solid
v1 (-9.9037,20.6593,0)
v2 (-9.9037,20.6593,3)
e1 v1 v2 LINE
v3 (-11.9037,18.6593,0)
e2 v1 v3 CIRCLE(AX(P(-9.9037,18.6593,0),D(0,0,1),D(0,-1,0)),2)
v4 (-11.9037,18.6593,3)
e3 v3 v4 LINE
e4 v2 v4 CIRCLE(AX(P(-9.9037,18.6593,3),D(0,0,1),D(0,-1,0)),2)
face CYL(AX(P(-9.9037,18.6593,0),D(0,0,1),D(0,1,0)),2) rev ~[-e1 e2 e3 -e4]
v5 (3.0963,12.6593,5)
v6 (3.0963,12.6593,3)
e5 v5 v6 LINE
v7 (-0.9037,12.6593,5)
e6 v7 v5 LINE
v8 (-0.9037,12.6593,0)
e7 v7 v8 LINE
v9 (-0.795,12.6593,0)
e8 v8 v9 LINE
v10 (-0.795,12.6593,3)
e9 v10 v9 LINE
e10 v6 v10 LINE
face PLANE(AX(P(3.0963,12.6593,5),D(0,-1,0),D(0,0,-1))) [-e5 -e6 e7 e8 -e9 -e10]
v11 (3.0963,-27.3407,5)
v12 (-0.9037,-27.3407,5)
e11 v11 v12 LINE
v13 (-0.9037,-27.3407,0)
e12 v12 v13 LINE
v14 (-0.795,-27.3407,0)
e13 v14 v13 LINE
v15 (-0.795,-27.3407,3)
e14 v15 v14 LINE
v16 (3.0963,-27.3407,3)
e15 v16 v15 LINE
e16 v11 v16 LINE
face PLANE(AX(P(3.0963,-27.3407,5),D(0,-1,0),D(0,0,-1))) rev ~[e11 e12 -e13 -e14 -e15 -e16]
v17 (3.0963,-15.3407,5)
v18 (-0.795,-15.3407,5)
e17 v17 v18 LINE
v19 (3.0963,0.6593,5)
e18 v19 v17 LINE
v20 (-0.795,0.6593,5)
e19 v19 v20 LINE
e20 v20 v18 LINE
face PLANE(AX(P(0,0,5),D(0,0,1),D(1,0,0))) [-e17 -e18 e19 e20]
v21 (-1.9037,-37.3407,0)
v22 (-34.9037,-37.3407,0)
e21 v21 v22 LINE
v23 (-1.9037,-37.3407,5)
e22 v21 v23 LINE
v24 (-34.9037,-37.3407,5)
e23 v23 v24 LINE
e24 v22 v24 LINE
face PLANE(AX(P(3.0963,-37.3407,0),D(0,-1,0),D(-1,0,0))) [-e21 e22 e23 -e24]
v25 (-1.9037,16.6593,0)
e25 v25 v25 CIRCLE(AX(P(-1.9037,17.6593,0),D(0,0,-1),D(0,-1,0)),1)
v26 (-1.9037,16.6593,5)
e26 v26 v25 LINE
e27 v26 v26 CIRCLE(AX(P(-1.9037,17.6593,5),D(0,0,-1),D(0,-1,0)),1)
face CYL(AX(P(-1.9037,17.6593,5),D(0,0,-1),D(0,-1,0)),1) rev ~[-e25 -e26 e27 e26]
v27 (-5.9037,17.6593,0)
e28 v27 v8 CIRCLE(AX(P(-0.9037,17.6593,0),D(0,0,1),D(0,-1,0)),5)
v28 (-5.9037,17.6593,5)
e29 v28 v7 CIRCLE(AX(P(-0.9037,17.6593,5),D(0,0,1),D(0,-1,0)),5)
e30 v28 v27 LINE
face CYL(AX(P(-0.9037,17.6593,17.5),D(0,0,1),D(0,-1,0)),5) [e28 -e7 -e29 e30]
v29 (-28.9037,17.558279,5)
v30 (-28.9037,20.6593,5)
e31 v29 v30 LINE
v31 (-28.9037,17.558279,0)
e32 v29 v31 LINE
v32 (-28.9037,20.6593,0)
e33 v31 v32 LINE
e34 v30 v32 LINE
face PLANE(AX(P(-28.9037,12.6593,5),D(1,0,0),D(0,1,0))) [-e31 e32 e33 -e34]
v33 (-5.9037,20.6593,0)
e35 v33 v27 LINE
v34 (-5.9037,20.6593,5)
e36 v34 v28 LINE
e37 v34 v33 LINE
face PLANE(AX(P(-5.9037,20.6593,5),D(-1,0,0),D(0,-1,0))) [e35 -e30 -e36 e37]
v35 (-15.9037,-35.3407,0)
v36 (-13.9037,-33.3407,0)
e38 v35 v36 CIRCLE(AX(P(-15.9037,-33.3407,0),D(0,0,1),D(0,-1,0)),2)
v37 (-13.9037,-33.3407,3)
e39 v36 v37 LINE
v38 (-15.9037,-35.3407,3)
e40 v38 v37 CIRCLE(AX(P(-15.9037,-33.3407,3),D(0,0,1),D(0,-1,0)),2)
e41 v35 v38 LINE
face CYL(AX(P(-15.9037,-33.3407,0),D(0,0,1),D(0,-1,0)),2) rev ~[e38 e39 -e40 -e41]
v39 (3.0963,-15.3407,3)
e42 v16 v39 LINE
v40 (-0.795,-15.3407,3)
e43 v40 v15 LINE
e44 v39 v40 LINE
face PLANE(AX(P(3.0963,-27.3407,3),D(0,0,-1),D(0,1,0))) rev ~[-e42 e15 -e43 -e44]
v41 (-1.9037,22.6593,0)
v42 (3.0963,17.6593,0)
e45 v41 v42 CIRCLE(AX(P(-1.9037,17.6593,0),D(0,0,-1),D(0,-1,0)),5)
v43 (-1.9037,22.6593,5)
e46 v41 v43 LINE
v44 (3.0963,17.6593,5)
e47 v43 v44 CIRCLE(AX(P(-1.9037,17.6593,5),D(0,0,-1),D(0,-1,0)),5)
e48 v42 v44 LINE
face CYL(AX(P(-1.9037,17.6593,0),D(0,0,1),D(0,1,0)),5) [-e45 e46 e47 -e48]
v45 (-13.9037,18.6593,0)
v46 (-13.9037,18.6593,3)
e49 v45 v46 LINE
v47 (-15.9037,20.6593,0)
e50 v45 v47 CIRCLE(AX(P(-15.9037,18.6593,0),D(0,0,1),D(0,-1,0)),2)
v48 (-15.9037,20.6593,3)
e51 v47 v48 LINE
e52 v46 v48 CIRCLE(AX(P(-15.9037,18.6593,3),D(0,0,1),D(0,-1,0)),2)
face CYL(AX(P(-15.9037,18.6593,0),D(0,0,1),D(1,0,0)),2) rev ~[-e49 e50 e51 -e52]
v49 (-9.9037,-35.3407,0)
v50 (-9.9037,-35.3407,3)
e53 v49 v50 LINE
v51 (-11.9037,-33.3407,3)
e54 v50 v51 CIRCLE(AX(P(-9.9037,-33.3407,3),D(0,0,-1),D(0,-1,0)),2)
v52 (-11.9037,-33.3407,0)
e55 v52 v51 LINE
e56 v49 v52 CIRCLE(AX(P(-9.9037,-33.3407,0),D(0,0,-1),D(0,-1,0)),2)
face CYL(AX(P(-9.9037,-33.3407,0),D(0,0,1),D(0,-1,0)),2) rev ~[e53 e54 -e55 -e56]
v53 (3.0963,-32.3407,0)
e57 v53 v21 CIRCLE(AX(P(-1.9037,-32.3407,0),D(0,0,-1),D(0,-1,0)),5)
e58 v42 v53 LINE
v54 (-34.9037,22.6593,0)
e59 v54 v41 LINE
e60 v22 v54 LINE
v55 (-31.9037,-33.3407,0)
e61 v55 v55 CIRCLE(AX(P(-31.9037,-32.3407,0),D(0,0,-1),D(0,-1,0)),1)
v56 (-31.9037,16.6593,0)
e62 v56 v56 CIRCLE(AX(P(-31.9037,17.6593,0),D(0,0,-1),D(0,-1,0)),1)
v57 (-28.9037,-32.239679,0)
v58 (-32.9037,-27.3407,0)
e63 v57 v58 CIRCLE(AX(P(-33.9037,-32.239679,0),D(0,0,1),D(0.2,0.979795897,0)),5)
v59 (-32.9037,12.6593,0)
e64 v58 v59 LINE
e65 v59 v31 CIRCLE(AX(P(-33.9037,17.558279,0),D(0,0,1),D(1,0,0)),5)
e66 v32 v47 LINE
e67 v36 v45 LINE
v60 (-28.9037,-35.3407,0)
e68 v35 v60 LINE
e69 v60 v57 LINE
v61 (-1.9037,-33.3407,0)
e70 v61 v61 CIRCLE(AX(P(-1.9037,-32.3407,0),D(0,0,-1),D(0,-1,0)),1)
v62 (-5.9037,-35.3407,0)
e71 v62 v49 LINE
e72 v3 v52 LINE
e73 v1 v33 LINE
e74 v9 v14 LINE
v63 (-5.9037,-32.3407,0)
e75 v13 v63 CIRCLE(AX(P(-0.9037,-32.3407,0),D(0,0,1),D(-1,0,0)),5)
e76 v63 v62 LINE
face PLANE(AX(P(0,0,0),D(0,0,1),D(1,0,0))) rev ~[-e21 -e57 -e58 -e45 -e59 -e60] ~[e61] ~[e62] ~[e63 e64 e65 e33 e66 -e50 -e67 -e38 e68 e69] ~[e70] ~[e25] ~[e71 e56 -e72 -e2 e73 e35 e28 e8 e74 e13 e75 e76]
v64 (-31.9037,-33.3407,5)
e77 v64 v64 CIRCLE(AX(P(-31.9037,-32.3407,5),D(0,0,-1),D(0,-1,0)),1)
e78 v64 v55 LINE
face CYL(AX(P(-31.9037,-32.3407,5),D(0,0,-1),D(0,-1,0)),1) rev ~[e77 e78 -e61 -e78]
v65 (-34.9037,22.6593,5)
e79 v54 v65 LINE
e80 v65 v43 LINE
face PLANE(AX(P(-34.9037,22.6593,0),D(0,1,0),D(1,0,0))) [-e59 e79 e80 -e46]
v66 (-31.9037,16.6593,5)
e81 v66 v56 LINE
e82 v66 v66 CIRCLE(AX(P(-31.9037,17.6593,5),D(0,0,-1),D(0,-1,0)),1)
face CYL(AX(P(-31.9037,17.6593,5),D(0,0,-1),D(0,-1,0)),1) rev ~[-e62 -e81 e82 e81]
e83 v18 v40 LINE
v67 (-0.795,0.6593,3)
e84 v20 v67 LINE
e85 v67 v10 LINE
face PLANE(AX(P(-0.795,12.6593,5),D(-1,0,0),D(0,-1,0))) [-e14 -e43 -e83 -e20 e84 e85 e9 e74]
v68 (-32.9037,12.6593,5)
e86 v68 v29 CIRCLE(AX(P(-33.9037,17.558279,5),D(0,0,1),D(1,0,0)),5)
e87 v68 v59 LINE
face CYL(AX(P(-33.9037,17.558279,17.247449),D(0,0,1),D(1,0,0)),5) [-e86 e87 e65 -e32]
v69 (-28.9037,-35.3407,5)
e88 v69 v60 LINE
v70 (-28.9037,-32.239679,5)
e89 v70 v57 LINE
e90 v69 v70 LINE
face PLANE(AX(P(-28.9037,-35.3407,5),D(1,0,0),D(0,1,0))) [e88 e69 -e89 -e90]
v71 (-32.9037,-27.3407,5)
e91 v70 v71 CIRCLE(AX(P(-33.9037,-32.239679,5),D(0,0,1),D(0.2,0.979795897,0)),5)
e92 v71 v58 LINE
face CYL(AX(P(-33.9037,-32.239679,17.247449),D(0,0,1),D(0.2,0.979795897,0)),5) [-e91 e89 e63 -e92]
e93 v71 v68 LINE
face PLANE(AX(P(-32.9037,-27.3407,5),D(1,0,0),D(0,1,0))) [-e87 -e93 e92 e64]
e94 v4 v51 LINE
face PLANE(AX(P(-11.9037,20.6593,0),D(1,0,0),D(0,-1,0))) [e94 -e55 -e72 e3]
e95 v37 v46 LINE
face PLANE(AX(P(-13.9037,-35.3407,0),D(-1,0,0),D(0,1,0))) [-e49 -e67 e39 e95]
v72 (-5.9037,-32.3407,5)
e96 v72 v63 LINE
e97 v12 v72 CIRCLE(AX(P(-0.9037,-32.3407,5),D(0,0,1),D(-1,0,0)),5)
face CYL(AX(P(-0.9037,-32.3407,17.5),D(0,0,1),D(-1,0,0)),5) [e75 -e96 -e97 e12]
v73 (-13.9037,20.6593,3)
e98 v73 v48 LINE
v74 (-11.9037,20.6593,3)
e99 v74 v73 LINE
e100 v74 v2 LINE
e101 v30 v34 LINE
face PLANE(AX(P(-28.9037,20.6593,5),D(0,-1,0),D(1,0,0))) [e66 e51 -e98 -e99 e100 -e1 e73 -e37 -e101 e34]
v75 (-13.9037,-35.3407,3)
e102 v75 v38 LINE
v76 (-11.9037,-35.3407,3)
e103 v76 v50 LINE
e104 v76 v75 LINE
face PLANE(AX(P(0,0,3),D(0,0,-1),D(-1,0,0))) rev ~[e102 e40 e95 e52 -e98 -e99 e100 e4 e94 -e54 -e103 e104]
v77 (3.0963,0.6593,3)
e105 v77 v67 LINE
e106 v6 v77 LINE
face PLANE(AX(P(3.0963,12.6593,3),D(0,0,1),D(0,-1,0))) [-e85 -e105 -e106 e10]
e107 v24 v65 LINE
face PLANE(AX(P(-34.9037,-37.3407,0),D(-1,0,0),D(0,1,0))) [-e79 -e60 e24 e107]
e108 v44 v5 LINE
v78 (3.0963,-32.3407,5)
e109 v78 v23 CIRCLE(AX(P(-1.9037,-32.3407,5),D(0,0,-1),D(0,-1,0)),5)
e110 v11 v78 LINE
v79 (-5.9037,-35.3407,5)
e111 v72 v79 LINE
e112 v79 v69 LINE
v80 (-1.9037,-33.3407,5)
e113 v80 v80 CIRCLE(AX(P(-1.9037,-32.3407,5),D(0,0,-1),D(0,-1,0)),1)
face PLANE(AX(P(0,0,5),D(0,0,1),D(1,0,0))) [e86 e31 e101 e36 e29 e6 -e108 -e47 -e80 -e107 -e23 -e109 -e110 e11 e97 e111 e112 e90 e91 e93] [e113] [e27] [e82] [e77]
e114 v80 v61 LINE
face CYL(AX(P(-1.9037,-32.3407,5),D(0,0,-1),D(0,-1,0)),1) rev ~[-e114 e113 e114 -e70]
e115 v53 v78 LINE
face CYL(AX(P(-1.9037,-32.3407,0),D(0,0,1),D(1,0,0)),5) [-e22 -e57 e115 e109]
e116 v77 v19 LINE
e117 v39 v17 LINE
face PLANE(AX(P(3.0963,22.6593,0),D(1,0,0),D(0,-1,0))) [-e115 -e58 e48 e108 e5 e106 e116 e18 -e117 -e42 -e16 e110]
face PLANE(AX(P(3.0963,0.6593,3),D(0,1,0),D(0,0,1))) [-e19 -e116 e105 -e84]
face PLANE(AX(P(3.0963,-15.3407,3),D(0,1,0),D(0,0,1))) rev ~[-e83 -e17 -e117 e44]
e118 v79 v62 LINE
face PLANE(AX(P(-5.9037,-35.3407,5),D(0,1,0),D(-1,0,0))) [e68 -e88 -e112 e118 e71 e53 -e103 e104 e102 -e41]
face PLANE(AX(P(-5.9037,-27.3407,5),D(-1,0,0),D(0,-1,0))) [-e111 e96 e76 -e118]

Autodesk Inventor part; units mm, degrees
ref_plane "YZ Plane" through (0, 0, 0) normal (1, 0, 0) x (0, 1, 0)
ref_plane "XZ Plane" through (0, 0, 0) normal (0, 1, 0) x (-1, 0, 0)
ref_plane "XY Plane" through (0, 0, 0) normal (0, 0, 1) x (1, 0, 0)
sketch "Sketch1" plane through (0, 0, 0) normal (0, 0, 1) x (1, 0, 0)
  line L0 (-34.9037, 22.6593) -> (3.0963, 22.6593)
  line L1 (3.0963, 22.6593) -> (3.0963, -37.3407)
  line L2 (3.0963, -37.3407) -> (-34.9037, -37.3407)
  line L3 (-34.9037, -37.3407) -> (-34.9037, 22.6593)
  point P0 (0, 0)
  dimension "d0" = 38
  dimension "d1" = 60
extrude "Extrusion1" add sketch "Sketch1" along normal blind 5
sketch "Sketch2" plane through (0, 0, 5) normal (0, 0, 1) x (1, 0, 0)
  line L0 (3.0963, -37.3407) -> (3.0963, 22.6593) projected
  line L1 (3.0963, 22.6593) -> (-34.9037, 22.6593) projected
  line L2 (-34.9037, -37.3407) -> (3.0963, -37.3407) projected
  point P0 (0, 0)
  point P1 (-31.9037, 17.6593)
  point P2 (-1.9037, 17.6593)
  point P3 (-31.9037, -32.3407)
  point P4 (-1.9037, -32.3407)
  dimension "d4" = 30
  dimension "d5" = 30
  dimension "d6" = 5
  dimension "d7" = 5
  dimension "d8" = 5
  dimension "d9" = 5
  dimension "d10" = 5
  dimension "d11" = 5
hole "Hole1" at (-31.9037, 17.6593, 5) at (-1.9037, 17.6593, 5) at (-31.9037, -32.3407, 5) at (-1.9037, -32.3407, 5) direction (0, 0, -1) diameter 2 depth 10 tip angle 118
sketch "Sketch3" plane through (0, 0, 5) normal (0, 0, 1) x (1, 0, 0)
  line L0 (-28.9037, 20.6593) -> (-5.9037, 20.6593)
  line L1 (-5.9037, 20.6593) -> (-5.9037, -35.3407)
  line L2 (-5.9037, -35.3407) -> (-28.9037, -35.3407)
  line L3 (-28.9037, -35.3407) -> (-28.9037, 20.6593)
  line L4 (-32.9037, 12.6593) -> (-0.795, 12.6593)
  line L5 (-0.795, 12.6593) -> (-0.795, -27.3407)
  line L6 (-0.795, -27.3407) -> (-32.9037, -27.3407)
  line L7 (-32.9037, -27.3407) -> (-32.9037, 12.6593)
  line L8 (-34.9037, 22.6593) -> (-34.9037, -37.3407) projected
  line L9 (3.0963, -37.3407) -> (3.0963, 22.6593) projected
  line L10 (3.0963, 22.6593) -> (-34.9037, 22.6593) projected
  line L11 (-34.9037, -37.3407) -> (3.0963, -37.3407) projected
  point P0 (0, 0)
  point P1 (-28.9037, 12.6593)
  point P2 (-28.9037, -27.3407)
  point P3 (-5.9037, -27.3407)
  point P4 (-5.9037, 12.6593)
  dimension "d19" = 2
  dimension "d20" = 3.8913
  dimension "d21" = 2
  dimension "d22" = 2
  dimension "d23" = 6
  dimension "d24" = 9
  dimension "d25" = 10
  dimension "d26" = 10
extrude "Extrusion2" cut sketch "Sketch3" against normal blind 5 contours L0 L1 L4 L3 | L4 L1 L6 L3 | L3 L6 L7 L4 | L4 L5 L6 L1 | L6 L1 L2 L3
sketch "Sketch4" plane through (3.0963, -37.3407, 0) normal (1, 0, 0) x (0, 0, -1)
  line L0 (-5, 50) -> (-3, 50)
  line L1 (-3, 50) -> (-3, 38)
  line L2 (-3, 38) -> (-5, 38)
  line L3 (-5, 38) -> (-5, 50)
  line L4 (-5, 60) -> (-5, 0) projected
  line L5 (-5, 10) -> (-3, 10)
  line L6 (-3, 10) -> (-3, 22)
  line L7 (-3, 22) -> (-5, 22)
  line L8 (-5, 22) -> (-5, 10)
  line L9 (-5, 10) -> (0, 10) projected
  line L10 (-5, 50) -> (0, 50) projected
  point P0 (0, 37.3407)
  dimension "d29" = 12
  dimension "d30" = 12
  dimension "d31" = 0
  dimension "d32" = 2
extrude "Extrusion3" cut sketch "Sketch4" against normal blind 5
fillet "Fillet1" radius 5 2 edges at (3.0963, 22.6593, 2.5) (3.0963, -37.3407, 2.5)
sketch "Sketch5" plane through (0, 0, 0) normal (0, 0, -1) x (-1, 0, 0)
  line L0 (5.9037, 20.6593) -> (28.9037, 20.6593) projected
  line L1 (13.9037, 20.6593) -> (11.9037, 20.6593)
  line L2 (11.9037, 20.6593) -> (11.9037, -35.3407)
  line L3 (11.9037, -35.3407) -> (13.9037, -35.3407)
  line L4 (13.9037, -35.3407) -> (13.9037, 20.6593)
  line L5 (-3.0963, -32.3407) -> (-3.0963, 17.6593) projected
  line L6 (28.9037, -35.3407) -> (5.9037, -35.3407) projected
  point P0 (0, 0)
  dimension "d36" = 15
  dimension "d37" = 2
extrude "Extrusion4" add sketch "Sketch5" against normal blind 3
fillet "Fillet2" radius 5 4 edges at (-28.9037, 12.6593, 2.5) (-28.9037, -27.3407, 2.5) (-5.9037, -27.3407, 2.5) (-5.9037, 12.6593, 2.5)
fillet "Fillet3" radius 2 4 edges at (-13.9037, 20.6593, 1.5) (-11.9037, 20.6593, 1.5) (-11.9037, -35.3407, 1.5) (-13.9037, -35.3407, 1.5)
properties part number "atx-adapter_cable-press"
